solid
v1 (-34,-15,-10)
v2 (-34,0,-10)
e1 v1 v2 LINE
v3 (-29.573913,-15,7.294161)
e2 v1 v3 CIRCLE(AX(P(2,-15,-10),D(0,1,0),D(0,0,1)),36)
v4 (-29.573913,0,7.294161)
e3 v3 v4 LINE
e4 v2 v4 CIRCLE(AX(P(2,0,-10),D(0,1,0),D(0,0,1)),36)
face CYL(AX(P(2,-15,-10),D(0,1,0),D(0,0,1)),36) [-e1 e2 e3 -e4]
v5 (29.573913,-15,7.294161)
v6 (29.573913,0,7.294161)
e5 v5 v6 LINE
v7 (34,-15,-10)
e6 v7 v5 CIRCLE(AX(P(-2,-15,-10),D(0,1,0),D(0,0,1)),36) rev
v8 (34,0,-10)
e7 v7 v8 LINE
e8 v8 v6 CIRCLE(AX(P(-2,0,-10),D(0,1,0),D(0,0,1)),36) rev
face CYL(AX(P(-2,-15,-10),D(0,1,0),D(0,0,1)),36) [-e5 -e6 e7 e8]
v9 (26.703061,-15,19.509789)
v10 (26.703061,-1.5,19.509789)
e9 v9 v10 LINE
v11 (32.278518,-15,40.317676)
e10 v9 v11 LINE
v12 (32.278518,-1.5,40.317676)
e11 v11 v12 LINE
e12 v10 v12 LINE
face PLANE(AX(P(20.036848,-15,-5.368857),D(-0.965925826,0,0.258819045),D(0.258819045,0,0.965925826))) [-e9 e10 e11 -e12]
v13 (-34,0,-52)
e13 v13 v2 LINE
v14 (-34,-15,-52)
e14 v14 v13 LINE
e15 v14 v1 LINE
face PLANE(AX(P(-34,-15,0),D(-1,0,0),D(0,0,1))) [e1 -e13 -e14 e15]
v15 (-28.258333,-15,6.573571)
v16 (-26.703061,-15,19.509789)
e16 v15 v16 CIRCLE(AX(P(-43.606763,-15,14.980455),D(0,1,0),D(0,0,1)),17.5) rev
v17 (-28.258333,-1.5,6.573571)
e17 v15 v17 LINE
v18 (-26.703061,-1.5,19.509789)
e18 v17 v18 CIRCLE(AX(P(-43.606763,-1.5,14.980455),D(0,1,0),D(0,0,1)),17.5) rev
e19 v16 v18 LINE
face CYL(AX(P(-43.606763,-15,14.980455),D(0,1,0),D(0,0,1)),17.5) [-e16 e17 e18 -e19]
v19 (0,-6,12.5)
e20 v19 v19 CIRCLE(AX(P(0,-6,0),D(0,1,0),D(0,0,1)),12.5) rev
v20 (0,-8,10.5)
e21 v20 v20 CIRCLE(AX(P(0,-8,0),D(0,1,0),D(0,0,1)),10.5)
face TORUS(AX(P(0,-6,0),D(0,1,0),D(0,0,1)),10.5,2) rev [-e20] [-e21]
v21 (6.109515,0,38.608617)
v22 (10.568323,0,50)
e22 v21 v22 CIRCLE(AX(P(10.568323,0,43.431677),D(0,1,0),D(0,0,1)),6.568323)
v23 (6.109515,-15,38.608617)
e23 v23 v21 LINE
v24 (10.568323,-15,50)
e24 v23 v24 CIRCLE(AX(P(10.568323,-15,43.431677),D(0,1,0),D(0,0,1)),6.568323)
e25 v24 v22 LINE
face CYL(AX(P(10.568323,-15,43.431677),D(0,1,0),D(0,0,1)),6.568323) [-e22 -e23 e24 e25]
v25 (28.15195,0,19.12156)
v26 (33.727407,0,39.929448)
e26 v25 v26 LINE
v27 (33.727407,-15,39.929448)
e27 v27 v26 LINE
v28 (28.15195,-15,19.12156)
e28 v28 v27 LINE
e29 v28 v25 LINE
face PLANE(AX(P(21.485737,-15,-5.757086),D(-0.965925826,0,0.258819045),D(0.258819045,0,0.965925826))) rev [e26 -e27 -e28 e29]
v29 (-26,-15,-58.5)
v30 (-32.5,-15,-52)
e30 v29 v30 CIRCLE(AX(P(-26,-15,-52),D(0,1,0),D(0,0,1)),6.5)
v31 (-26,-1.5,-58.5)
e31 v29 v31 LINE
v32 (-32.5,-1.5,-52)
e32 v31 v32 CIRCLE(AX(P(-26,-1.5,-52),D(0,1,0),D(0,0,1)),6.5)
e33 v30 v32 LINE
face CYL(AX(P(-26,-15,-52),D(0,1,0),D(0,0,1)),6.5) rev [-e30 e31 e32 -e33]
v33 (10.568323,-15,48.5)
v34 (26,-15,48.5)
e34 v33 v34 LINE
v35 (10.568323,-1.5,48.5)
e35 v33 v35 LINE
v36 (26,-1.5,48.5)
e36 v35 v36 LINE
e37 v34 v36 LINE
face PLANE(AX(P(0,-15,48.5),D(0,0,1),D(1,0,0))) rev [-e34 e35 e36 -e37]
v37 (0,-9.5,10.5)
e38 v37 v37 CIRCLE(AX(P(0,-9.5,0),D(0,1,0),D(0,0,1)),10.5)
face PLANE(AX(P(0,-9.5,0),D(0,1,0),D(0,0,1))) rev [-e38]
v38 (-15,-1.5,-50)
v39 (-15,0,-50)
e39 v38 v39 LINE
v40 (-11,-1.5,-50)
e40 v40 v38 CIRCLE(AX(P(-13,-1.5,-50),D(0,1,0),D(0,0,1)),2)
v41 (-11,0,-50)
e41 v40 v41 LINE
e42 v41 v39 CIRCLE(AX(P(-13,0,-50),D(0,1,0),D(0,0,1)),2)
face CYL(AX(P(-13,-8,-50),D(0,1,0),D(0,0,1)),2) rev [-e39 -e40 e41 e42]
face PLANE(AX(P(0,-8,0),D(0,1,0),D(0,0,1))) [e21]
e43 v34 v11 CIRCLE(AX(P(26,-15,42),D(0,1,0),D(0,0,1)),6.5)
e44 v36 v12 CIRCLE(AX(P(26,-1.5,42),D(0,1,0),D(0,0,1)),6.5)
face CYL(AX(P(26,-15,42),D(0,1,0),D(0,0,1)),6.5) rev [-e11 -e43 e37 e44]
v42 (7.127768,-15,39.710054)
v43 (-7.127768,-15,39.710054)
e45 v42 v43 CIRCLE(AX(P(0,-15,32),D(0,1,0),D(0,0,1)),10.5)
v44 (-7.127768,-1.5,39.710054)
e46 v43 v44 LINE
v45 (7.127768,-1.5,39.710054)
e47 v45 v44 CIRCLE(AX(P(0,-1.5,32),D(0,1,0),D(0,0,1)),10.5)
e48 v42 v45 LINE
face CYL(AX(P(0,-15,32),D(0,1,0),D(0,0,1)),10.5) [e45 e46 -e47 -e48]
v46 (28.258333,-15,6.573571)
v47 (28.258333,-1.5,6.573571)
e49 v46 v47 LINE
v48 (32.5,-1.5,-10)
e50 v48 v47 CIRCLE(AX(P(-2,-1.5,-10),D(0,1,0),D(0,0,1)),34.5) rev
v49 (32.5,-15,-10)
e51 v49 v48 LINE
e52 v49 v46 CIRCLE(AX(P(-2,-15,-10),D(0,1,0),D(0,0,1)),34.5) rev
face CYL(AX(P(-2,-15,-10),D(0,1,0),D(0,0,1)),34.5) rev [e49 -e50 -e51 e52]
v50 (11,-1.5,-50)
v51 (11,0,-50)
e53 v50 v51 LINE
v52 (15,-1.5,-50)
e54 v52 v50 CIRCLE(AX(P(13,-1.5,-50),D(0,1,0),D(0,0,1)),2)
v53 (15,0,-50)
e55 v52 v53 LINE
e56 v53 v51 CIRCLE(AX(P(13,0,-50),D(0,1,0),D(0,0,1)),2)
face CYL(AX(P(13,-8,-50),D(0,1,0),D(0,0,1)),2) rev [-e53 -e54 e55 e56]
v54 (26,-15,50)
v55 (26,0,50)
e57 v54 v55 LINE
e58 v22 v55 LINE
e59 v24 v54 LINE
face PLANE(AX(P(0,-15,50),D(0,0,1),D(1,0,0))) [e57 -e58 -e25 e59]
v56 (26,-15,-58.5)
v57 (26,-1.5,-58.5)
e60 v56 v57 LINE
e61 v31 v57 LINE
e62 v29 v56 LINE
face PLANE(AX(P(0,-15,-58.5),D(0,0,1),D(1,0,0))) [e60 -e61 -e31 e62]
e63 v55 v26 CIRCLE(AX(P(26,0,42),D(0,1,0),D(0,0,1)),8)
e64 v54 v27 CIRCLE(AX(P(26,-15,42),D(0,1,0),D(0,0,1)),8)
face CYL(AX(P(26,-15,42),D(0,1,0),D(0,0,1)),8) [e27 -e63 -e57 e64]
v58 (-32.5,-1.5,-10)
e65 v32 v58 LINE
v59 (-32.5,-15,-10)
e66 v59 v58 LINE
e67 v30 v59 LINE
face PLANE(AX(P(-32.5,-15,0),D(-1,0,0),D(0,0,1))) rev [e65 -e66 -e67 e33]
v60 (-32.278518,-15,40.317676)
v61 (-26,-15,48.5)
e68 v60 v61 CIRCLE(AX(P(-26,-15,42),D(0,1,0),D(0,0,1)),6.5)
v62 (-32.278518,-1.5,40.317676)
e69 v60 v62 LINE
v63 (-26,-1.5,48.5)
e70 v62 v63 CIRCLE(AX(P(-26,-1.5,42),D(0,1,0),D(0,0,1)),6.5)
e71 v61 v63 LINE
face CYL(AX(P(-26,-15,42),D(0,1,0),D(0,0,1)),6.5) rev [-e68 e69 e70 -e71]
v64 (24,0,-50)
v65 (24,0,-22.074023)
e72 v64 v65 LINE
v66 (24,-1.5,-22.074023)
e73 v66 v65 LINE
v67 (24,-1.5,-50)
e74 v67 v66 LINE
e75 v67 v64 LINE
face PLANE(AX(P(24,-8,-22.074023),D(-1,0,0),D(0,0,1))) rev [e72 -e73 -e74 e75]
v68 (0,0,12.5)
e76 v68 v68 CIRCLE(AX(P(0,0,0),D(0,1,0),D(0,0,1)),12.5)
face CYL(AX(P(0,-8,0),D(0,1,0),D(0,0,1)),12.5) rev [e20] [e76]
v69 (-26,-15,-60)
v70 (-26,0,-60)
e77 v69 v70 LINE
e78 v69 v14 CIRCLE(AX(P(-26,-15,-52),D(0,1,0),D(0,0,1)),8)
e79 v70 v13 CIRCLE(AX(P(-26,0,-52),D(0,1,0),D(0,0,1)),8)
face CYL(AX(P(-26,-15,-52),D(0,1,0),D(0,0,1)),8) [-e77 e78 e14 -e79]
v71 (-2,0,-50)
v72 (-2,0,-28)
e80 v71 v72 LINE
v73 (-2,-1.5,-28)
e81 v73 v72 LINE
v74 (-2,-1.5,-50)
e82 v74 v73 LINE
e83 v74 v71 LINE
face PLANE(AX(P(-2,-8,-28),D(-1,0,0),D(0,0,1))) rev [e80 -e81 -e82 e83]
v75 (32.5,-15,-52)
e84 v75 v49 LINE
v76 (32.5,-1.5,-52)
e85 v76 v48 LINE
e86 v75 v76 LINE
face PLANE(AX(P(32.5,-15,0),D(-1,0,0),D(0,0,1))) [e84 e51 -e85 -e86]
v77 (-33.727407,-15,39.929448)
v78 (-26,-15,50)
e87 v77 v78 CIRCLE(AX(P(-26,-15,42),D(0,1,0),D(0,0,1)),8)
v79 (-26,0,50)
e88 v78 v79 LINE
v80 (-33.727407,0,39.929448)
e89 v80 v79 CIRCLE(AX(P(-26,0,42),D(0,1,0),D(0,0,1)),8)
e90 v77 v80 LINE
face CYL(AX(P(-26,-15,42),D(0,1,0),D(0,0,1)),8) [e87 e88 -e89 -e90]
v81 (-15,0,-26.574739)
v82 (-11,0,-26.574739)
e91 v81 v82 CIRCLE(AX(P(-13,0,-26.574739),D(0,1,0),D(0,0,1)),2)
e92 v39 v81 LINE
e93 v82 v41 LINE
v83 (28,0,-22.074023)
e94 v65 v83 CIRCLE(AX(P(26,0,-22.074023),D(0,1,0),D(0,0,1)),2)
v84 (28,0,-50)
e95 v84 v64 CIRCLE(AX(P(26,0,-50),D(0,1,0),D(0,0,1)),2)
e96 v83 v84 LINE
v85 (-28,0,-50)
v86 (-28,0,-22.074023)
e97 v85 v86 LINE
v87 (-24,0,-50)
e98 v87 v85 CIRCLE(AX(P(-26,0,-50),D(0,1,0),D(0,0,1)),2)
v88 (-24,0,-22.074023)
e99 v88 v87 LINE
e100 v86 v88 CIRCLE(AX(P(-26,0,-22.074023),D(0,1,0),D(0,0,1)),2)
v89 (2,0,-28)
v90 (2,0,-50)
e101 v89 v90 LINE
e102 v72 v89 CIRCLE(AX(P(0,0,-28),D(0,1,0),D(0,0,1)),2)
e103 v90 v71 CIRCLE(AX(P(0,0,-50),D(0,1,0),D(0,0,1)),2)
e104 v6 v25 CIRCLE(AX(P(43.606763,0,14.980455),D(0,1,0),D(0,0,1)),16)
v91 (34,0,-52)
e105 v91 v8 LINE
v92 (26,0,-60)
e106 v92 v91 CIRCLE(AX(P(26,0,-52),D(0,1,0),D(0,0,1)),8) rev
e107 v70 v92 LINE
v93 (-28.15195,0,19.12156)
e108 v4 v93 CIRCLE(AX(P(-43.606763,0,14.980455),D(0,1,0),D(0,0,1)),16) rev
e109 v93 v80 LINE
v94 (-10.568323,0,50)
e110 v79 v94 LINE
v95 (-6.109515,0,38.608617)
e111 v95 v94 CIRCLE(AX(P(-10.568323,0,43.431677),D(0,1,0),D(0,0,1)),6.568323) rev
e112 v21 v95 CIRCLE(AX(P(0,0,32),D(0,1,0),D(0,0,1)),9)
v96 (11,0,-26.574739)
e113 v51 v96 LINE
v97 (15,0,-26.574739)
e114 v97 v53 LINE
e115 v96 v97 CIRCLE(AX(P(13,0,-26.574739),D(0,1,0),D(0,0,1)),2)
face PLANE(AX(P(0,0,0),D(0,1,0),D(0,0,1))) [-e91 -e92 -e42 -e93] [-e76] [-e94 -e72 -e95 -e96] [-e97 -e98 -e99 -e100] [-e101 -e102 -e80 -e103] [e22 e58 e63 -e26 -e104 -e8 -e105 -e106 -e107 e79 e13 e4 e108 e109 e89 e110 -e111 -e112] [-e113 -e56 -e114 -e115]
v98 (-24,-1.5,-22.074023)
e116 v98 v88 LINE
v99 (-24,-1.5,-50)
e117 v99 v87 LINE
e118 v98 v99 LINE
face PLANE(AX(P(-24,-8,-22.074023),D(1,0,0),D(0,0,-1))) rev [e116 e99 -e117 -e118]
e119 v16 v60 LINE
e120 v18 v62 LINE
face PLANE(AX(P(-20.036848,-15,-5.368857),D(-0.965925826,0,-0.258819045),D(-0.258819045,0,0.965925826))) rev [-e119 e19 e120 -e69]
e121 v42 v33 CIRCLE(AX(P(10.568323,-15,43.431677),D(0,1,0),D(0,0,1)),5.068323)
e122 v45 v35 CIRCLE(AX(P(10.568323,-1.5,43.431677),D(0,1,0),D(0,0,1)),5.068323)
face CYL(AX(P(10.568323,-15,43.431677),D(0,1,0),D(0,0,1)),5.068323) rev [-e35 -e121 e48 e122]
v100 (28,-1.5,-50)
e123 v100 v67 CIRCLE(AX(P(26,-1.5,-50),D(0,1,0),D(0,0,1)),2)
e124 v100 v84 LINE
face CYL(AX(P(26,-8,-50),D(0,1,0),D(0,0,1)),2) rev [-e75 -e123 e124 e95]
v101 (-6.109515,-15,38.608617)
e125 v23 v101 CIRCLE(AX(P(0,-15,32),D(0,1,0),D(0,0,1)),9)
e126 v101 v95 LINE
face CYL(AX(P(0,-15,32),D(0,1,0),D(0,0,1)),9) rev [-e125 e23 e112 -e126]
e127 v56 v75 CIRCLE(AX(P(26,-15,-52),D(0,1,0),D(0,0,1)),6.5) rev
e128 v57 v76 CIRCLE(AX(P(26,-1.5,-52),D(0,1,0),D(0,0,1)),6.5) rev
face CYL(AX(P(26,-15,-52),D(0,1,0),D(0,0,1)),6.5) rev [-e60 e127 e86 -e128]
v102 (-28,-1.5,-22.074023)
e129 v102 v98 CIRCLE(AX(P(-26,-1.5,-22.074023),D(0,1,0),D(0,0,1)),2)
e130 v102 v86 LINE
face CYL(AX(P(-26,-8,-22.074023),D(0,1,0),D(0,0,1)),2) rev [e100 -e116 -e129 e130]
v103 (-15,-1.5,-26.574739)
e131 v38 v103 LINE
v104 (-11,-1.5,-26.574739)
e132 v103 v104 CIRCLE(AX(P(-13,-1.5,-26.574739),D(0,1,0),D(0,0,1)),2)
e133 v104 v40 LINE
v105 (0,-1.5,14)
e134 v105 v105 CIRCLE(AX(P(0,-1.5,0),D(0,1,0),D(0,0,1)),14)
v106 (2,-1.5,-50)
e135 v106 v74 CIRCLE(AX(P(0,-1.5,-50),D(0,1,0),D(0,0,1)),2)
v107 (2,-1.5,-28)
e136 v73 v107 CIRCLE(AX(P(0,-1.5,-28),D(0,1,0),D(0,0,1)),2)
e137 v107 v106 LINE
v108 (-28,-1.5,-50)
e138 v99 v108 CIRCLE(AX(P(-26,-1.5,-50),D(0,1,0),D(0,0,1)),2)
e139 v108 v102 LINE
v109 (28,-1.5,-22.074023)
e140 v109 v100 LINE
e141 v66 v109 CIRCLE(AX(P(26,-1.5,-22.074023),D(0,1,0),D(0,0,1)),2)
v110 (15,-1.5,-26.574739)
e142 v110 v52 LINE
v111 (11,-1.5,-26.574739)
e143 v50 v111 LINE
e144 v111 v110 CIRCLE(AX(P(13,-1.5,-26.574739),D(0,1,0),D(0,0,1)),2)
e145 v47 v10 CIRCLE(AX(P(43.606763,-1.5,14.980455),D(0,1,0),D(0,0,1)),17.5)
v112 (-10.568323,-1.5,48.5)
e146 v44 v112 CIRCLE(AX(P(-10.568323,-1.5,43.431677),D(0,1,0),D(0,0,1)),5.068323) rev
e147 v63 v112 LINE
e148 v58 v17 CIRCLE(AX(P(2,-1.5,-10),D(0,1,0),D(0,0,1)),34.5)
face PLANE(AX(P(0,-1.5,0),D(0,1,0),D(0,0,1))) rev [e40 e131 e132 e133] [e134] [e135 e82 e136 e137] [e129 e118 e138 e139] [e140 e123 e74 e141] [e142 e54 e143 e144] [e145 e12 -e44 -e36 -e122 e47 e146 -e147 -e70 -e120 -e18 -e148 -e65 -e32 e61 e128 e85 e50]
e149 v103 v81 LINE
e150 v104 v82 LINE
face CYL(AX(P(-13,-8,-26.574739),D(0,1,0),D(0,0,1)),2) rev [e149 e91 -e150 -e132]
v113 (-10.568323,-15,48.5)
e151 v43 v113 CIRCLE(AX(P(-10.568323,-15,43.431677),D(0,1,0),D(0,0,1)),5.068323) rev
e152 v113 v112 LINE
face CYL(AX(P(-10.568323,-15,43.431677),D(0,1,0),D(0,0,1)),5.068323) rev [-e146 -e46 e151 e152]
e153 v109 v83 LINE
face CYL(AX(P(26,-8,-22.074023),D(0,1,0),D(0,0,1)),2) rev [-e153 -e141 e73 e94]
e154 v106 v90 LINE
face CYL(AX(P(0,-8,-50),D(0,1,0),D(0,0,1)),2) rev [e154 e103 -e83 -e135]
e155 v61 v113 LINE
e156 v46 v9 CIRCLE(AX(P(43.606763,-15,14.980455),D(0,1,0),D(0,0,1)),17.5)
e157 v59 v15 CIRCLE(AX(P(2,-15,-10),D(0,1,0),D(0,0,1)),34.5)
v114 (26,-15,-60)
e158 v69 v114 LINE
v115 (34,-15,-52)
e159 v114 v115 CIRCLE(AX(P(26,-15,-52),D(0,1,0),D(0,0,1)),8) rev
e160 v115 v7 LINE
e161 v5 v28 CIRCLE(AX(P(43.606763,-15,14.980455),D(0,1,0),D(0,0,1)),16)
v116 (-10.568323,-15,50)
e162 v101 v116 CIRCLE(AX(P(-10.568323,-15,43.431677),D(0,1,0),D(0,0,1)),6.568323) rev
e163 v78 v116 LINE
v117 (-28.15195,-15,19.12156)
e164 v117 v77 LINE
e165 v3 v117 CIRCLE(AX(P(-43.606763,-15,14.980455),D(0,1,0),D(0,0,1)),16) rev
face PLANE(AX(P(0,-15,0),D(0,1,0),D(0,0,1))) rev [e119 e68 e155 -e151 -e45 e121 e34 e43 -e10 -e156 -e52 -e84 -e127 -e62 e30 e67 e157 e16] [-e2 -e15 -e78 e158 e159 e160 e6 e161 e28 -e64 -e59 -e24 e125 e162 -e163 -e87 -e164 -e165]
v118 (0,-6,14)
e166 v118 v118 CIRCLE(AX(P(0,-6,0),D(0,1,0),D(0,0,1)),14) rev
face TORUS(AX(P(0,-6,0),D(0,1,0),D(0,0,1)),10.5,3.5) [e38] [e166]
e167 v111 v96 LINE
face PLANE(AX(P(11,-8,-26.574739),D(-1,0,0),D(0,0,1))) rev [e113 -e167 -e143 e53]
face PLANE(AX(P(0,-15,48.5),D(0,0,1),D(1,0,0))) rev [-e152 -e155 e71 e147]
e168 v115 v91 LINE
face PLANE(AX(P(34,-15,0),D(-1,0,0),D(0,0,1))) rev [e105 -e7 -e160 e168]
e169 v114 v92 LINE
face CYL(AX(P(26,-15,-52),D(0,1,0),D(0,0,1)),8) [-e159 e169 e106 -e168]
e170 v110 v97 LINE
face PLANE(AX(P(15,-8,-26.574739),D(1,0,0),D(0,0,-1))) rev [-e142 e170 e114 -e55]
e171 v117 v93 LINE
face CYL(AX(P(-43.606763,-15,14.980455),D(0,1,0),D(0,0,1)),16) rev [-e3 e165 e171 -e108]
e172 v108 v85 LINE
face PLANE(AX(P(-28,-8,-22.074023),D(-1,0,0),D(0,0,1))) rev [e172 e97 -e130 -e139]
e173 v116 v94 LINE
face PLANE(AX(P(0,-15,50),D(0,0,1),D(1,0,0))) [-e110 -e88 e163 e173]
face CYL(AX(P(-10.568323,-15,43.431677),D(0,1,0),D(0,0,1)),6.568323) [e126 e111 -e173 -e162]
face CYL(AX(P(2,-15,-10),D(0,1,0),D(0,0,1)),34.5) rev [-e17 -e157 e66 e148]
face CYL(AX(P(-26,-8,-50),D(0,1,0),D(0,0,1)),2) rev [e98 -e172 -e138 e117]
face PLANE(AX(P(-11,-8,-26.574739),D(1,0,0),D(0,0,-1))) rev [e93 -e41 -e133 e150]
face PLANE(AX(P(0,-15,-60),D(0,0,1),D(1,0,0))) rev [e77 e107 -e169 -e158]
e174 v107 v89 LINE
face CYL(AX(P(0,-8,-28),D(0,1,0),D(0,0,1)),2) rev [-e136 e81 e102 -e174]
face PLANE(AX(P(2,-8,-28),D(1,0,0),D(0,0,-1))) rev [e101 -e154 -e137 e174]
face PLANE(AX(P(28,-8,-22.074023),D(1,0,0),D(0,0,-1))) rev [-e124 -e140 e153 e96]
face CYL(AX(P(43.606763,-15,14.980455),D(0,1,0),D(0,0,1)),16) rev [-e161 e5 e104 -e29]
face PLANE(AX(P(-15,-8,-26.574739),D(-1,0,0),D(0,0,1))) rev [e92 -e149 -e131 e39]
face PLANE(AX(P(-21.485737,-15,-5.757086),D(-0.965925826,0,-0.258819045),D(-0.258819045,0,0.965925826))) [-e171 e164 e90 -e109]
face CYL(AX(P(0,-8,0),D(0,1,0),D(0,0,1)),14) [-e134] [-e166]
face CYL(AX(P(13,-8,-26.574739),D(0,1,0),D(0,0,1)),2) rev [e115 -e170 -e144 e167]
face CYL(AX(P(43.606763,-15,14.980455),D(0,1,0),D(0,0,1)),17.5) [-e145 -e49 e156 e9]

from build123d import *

# Parameters (mm, degrees)
SKETCH_1_R             = 12.5
EXTRUDE_1_DEPTH        = 15
SKETCH_1_3_R           = 12.5
CUT_EXTRUDE_1_DEPTH    = 8
FILLET_1_R             = 2
SHELL_1_T              = -1.5
CUT_EXTRUDE_2_DEPTH    = 8
PATTERN_START          = -1.5
PATTERN_LINEAR_6_DEPTH = 1.5


# Read off the part's stored shape, not the designer's step: 阵列(线性)6
with BuildPart() as part:
    # 草图1 → 凸台-拉伸1 (new body)
    # profile 1 of 2: a face of its own
    with BuildSketch(Plane(origin=(0, 0, 0), x_dir=(1, 0, 0), z_dir=(0, 1, 0))):
        with BuildLine():
            ThreePointArc((6.109515315, -38.6086173), (0, -23), (-6.109515315, -38.6086173))
            ThreePointArc((-6.109515315, -38.6086173), (-4.451858441, -45.825779601), (-10.568323275, -50))
            Line((-10.568323275, -50), (-26, -50))
            ThreePointArc((-26, -50), (-32.346826722, -46.870091432), (-33.72740661, -39.929447639))
            Line((-33.72740661, -39.929447639), (-28.151949957, -19.121560132))
            ThreePointArc((-28.151949957, -19.121560132), (-27.721159204, -13.070589863), (-29.573912969, -7.294161438))
            ThreePointArc((-29.573912969, -7.294161438), (-32.875929141, 1.074218994), (-34, 10))
            Line((-34, 10), (-34, 52))
            ThreePointArc((-34, 52), (-31.656854249, 57.656854249), (-26, 60))
            Line((-26, 60), (26, 60))
            ThreePointArc((26, 60), (31.656854249, 57.656854249), (34, 52))
            Line((34, 52), (34, 10))
            ThreePointArc((34, 10), (32.875929141, 1.074218994), (29.573912969, -7.294161438))
            ThreePointArc((29.573912969, -7.294161438), (27.721159204, -13.070589863), (28.151949957, -19.121560132))
            Line((28.151949957, -19.121560132), (33.72740661, -39.929447639))
            ThreePointArc((33.72740661, -39.929447639), (32.346826722, -46.870091432), (26, -50))
            Line((26, -50), (10.568323275, -50))
            ThreePointArc((10.568323275, -50), (4.451858441, -45.825779601), (6.109515315, -38.6086173))
        make_face()
        Circle(SKETCH_1_R, mode=Mode.SUBTRACT)
    # profile 2 of 2: a face of its own
    with BuildSketch(Plane(origin=(0, 0, 0), x_dir=(1, 0, 0), z_dir=(0, 1, 0))):
        Circle(SKETCH_1_R)
    extrude(amount=-EXTRUDE_1_DEPTH)

    # 草图1<3> → 切除-拉伸1 (cut)
    with BuildSketch(Plane(origin=(0, 0, 0), x_dir=(1, 0, 0), z_dir=(0, 1, 0))):
        with Locations(Location((0, 0, 0), (0, 0, 270))):
            Circle(SKETCH_1_3_R)
    extrude(amount=-CUT_EXTRUDE_1_DEPTH, mode=Mode.SUBTRACT)

    # 圆角1
    fillet_1_edges = [part.edges().sort_by_distance(p)[0] for p in [
        (0, -8, -12.5),
    ]]
    fillet(fillet_1_edges, radius=FILLET_1_R)

    # 抽壳1
    shell_1_openings = [part.faces().sort_by_distance(p)[0] for p in [
        (0, -15, -8.148675604),
    ]]
    offset(amount=SHELL_1_T, openings=shell_1_openings, kind=Kind.INTERSECTION)

    # 草图2 → 切除-拉伸2 (cut)
    with BuildSketch(Plane(origin=(0, 0, 0), x_dir=(1, 0, 0), z_dir=(0, 1, 0))):
        with BuildLine():
            Line((-28, 22.074023338), (-28, 50))
            ThreePointArc((-28, 50), (-26, 52), (-24, 50))
            Line((-24, 50), (-24, 22.074023338))
            ThreePointArc((-24, 22.074023338), (-26, 20.074023338), (-28, 22.074023338))
        make_face()
    extrude(amount=-CUT_EXTRUDE_2_DEPTH, mode=Mode.SUBTRACT)

    # 阵列(线性)6 outline → 阵列(线性)6 (cut)
    with BuildSketch(Plane(origin=(0, 0, 0), x_dir=(1, 0, 0), z_dir=(0, 1, 0)).offset(PATTERN_START)):
        with BuildLine():
            Line((24, 50), (24, 22.074023338))
            ThreePointArc((24, 22.074023338), (26, 20.074023338), (28, 22.074023338))
            Line((28, 22.074023338), (28, 50))
            ThreePointArc((28, 50), (26, 52), (24, 50))
        make_face()
        with BuildLine():
            Line((11, 50), (11, 26.574738582))
            ThreePointArc((11, 26.574738582), (13, 24.574738582), (15, 26.574738582))
            Line((15, 26.574738582), (15, 50))
            ThreePointArc((15, 50), (13, 52), (11, 50))
        make_face()
        with BuildLine():
            Line((-2, 50), (-2, 28))
            ThreePointArc((-2, 28), (0, 26), (2, 28))
            Line((2, 28), (2, 50))
            ThreePointArc((2, 50), (0, 52), (-2, 50))
        make_face()
        with BuildLine():
            Line((-15, 50), (-15, 26.574738582))
            ThreePointArc((-15, 26.574738582), (-13, 24.574738582), (-11, 26.574738582))
            Line((-11, 26.574738582), (-11, 50))
            ThreePointArc((-11, 50), (-13, 52), (-15, 50))
        make_face()
    extrude(amount=PATTERN_LINEAR_6_DEPTH, mode=Mode.SUBTRACT)


solid = part.part
